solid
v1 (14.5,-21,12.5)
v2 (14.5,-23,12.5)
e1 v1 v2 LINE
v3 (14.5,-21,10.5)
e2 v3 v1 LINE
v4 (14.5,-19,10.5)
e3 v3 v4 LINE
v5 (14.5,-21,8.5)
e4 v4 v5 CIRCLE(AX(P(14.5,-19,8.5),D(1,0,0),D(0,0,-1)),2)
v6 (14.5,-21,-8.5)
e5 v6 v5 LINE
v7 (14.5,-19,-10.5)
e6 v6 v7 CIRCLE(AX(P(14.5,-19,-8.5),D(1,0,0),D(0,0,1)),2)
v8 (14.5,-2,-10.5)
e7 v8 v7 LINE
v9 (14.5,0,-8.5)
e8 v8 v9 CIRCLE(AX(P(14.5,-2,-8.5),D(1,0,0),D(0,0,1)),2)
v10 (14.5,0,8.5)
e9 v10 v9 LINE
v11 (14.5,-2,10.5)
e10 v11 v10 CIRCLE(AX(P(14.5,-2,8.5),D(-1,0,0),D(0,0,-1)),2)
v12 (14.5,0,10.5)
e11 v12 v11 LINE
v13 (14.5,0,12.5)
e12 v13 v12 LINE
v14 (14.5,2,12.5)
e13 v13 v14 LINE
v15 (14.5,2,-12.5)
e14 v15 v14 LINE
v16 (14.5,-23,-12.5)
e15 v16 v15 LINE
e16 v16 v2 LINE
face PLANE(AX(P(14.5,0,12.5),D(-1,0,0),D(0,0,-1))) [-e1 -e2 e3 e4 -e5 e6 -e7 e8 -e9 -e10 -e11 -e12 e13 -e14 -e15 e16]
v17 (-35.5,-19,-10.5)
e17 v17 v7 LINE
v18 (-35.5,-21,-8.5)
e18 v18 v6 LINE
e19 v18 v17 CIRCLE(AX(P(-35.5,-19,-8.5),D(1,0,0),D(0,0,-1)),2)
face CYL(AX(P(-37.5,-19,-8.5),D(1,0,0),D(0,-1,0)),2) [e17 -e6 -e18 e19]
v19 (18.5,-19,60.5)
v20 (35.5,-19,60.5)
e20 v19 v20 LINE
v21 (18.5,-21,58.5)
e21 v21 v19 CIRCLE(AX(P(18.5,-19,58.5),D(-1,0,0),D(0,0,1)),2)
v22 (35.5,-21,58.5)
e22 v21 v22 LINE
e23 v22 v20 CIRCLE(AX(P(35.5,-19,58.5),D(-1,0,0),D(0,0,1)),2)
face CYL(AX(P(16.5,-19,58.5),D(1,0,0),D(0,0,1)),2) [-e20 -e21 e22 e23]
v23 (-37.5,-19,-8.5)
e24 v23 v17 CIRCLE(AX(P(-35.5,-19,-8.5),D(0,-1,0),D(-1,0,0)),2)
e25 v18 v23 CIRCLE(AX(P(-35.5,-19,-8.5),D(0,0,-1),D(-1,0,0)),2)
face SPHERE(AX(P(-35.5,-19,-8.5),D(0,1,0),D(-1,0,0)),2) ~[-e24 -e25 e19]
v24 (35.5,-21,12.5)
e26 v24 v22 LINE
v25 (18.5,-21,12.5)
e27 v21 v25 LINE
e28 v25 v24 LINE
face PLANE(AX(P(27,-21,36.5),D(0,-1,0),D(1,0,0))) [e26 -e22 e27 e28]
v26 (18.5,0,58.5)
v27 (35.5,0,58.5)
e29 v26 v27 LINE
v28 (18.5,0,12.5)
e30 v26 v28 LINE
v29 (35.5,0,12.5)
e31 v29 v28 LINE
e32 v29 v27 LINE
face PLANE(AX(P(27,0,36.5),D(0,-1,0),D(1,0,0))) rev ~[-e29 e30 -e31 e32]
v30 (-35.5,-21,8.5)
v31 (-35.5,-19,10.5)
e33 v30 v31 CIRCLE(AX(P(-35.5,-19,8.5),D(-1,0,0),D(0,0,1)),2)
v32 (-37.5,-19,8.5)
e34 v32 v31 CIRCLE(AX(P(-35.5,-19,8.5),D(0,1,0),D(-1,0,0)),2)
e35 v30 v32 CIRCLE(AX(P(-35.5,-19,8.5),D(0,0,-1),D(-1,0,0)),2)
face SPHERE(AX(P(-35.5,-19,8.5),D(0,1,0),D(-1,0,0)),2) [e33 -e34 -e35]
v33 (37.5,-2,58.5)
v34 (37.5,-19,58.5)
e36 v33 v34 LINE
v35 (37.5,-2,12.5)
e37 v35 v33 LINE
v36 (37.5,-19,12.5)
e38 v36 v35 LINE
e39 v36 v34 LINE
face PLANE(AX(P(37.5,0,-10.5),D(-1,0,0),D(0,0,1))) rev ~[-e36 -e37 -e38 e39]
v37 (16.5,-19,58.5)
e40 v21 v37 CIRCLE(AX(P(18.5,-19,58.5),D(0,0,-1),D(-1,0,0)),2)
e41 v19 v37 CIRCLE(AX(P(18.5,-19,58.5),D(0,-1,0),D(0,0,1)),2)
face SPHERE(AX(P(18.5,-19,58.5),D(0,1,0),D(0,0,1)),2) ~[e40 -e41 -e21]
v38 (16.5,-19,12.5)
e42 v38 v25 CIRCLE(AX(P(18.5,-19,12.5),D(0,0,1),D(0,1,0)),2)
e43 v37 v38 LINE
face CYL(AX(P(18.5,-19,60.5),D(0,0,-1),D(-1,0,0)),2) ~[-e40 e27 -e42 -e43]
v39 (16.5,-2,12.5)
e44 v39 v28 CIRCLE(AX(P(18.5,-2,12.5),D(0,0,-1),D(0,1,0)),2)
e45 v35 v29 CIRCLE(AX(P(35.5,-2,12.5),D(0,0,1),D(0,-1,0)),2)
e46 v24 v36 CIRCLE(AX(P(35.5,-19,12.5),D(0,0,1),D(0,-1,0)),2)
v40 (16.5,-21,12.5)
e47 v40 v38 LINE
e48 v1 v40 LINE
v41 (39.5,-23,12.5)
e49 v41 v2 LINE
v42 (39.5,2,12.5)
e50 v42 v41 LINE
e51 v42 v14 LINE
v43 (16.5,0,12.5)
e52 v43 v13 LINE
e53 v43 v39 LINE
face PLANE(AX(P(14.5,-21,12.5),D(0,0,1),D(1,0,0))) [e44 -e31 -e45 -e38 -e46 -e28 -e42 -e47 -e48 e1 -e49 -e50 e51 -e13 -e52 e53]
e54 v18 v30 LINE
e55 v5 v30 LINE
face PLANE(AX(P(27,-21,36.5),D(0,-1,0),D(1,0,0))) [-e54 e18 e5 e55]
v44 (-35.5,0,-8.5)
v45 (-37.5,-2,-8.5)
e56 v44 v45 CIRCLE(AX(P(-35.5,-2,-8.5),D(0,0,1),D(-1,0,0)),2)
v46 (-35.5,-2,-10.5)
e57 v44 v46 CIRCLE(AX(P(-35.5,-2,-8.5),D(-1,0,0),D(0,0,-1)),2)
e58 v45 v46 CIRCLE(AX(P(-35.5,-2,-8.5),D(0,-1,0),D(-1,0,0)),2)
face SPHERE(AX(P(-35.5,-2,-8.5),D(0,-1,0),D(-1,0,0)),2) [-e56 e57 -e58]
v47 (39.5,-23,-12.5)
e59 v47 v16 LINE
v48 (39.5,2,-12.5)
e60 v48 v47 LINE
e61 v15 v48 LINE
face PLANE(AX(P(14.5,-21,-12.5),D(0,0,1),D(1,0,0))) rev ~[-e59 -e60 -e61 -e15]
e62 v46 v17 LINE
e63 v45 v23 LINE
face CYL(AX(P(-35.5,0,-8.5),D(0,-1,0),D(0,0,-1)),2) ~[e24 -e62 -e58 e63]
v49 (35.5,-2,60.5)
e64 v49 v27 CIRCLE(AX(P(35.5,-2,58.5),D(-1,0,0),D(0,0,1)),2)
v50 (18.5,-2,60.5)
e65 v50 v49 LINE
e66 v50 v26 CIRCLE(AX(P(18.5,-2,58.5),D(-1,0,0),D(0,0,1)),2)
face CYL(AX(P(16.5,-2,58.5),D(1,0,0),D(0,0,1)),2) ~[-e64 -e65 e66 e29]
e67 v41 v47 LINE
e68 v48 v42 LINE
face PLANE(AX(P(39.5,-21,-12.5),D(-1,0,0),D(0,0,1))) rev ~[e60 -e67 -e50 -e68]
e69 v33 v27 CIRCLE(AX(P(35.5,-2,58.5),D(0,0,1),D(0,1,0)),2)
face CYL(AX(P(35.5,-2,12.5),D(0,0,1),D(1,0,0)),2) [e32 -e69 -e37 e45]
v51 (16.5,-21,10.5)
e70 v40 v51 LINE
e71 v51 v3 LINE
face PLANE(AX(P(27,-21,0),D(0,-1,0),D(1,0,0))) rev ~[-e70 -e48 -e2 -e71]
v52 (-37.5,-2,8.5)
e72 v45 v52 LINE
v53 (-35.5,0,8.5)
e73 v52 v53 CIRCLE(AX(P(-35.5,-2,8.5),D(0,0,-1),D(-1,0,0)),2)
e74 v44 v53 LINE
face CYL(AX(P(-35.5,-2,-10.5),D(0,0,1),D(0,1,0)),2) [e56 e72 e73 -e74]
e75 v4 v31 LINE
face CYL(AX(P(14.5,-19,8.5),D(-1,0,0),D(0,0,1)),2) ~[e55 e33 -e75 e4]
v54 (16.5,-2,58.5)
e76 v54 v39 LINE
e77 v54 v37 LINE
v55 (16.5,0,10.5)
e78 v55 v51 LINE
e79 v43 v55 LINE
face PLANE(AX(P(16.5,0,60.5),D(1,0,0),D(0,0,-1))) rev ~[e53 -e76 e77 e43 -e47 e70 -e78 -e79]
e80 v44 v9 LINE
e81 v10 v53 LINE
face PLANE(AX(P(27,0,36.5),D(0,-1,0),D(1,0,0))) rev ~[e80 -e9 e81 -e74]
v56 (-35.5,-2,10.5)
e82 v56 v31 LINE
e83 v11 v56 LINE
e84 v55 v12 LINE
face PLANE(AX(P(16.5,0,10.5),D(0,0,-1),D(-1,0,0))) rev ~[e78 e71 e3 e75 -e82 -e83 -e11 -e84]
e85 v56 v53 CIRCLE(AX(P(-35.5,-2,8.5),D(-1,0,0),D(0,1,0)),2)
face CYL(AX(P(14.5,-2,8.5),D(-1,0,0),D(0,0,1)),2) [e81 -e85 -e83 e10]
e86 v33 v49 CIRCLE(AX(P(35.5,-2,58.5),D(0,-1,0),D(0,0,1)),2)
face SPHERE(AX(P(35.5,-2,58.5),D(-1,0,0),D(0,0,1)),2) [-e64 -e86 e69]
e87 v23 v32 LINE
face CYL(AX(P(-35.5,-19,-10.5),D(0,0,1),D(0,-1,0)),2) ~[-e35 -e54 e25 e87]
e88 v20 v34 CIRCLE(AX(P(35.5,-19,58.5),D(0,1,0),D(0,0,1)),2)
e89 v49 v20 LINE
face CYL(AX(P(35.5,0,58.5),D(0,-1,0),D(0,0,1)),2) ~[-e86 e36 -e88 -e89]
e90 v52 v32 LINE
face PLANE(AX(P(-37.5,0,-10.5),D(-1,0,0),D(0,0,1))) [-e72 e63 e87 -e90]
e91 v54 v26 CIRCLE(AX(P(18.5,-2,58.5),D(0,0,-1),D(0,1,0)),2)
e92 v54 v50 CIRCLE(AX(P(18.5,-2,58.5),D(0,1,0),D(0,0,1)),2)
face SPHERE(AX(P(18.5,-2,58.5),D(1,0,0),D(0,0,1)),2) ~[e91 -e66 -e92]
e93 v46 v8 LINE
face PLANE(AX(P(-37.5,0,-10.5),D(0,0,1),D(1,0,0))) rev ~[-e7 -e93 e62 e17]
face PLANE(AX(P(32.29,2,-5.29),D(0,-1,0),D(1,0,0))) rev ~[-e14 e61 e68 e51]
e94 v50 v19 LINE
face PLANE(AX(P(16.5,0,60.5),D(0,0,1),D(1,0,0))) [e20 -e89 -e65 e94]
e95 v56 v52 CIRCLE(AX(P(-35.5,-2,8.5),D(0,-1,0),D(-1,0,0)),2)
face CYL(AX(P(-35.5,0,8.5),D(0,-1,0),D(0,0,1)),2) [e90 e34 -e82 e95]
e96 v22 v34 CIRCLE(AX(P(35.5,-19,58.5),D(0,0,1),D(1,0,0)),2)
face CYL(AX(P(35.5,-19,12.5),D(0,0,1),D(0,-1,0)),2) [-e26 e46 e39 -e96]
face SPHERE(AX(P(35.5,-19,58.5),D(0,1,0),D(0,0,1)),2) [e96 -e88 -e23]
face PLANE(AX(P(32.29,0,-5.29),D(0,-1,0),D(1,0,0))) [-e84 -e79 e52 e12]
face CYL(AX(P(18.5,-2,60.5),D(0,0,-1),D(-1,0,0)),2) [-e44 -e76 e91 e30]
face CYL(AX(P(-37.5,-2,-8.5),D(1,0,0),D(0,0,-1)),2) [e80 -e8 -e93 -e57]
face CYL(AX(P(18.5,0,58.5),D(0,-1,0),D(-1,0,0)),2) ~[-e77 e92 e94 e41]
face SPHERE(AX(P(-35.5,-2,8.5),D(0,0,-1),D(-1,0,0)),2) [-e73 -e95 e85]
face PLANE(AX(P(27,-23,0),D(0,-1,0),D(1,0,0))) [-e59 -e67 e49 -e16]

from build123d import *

# Parameters (mm, degrees)
F0_W     = 21
F0_H     = 48
F0_W_2   = 52
F0_H_2   = 21
F1_DEPTH = 21
F0_W_3   = 2
F0_H_3   = 2
F2_DEPTH = 2
F3_W     = 25
F3_H     = 25
F4_DEPTH = 2
F5_W     = 25
F5_H     = 25
F6_DEPTH = 2
F7_W     = 25
F7_H     = 25
F8_DEPTH = 2
F9_R     = 2


with BuildPart() as f1:
    # F0 (on Front) → F1 (new body)
    with BuildSketch(Plane.XZ):
        with Locations((27, 36.5)):
            Rectangle(F0_W, F0_H)
        with Locations((-11.5, 0)):
            Rectangle(F0_W_2, F0_H_2)
        Polygon((14.5, -10.5), (37.5, -10.5), (37.5, 10.5), (37.5, 12.5), (16.5, 12.5), (16.5, 10.5), (14.5, 10.5), align=None)
    extrude(amount=F1_DEPTH)

    # F0 (on Front) → F2 (join)
    with BuildSketch(Plane.XZ):
        Polygon((37.5, 10.5), (37.5, -10.5), (14.5, -10.5), (14.5, -12.5), (39.5, -12.5), (39.5, 12.5), (37.5, 12.5), align=None)
        with Locations((15.5, 11.5)):
            Rectangle(F0_W_3, F0_H_3)
        Polygon((14.5, -10.5), (37.5, -10.5), (37.5, 10.5), (37.5, 12.5), (16.5, 12.5), (16.5, 10.5), (14.5, 10.5), align=None)
    extrude(amount=-F2_DEPTH)

    # F3 (on face) → F4 (join)
    with BuildSketch(Plane.XZ.offset(21)):
        with Locations((27, 0)):
            Rectangle(F3_W, F3_H)
    extrude(amount=F4_DEPTH)

    # F5 (on face) → F6 (join)
    with BuildSketch(Plane.YZ.offset(37.5)):
        with Locations((-10.5, 0)):
            Rectangle(F5_W, F5_H)
    extrude(amount=F6_DEPTH)

    # F7 (on face) → F8 (join)
    with BuildSketch(Plane(origin=(0, 0, -10.5), x_dir=(1, 0, 0), z_dir=(0, 0, -1))):
        with Locations((27, 10.5)):
            Rectangle(F7_W, F7_H)
    extrude(amount=F8_DEPTH)

    # F9
    f9_edges = [f1.edges().sort_by_distance(p)[0] for p in [
        (-37.5, -10.5, -10.5),
        (-37.5, 0, 0),
        (-37.5, -10.5, 10.5),
        (-37.5, -21, 0),
        (27, 0, 60.5),
        (16.5, -10.5, 60.5),
        (37.5, -10.5, 60.5),
        (27, -21, 60.5),
        (16.5, -21, 36.5),
        (37.5, -21, 36.5),
        (37.5, 0, 36.5),
        (16.5, 0, 36.5),
        (-11.5, 0, 10.5),
        (-11.5, 0, -10.5),
        (-11.5, -21, 10.5),
        (-11.5, -21, -10.5),
    ]]
    fillet(f9_edges, radius=F9_R)


solid = f1.part
